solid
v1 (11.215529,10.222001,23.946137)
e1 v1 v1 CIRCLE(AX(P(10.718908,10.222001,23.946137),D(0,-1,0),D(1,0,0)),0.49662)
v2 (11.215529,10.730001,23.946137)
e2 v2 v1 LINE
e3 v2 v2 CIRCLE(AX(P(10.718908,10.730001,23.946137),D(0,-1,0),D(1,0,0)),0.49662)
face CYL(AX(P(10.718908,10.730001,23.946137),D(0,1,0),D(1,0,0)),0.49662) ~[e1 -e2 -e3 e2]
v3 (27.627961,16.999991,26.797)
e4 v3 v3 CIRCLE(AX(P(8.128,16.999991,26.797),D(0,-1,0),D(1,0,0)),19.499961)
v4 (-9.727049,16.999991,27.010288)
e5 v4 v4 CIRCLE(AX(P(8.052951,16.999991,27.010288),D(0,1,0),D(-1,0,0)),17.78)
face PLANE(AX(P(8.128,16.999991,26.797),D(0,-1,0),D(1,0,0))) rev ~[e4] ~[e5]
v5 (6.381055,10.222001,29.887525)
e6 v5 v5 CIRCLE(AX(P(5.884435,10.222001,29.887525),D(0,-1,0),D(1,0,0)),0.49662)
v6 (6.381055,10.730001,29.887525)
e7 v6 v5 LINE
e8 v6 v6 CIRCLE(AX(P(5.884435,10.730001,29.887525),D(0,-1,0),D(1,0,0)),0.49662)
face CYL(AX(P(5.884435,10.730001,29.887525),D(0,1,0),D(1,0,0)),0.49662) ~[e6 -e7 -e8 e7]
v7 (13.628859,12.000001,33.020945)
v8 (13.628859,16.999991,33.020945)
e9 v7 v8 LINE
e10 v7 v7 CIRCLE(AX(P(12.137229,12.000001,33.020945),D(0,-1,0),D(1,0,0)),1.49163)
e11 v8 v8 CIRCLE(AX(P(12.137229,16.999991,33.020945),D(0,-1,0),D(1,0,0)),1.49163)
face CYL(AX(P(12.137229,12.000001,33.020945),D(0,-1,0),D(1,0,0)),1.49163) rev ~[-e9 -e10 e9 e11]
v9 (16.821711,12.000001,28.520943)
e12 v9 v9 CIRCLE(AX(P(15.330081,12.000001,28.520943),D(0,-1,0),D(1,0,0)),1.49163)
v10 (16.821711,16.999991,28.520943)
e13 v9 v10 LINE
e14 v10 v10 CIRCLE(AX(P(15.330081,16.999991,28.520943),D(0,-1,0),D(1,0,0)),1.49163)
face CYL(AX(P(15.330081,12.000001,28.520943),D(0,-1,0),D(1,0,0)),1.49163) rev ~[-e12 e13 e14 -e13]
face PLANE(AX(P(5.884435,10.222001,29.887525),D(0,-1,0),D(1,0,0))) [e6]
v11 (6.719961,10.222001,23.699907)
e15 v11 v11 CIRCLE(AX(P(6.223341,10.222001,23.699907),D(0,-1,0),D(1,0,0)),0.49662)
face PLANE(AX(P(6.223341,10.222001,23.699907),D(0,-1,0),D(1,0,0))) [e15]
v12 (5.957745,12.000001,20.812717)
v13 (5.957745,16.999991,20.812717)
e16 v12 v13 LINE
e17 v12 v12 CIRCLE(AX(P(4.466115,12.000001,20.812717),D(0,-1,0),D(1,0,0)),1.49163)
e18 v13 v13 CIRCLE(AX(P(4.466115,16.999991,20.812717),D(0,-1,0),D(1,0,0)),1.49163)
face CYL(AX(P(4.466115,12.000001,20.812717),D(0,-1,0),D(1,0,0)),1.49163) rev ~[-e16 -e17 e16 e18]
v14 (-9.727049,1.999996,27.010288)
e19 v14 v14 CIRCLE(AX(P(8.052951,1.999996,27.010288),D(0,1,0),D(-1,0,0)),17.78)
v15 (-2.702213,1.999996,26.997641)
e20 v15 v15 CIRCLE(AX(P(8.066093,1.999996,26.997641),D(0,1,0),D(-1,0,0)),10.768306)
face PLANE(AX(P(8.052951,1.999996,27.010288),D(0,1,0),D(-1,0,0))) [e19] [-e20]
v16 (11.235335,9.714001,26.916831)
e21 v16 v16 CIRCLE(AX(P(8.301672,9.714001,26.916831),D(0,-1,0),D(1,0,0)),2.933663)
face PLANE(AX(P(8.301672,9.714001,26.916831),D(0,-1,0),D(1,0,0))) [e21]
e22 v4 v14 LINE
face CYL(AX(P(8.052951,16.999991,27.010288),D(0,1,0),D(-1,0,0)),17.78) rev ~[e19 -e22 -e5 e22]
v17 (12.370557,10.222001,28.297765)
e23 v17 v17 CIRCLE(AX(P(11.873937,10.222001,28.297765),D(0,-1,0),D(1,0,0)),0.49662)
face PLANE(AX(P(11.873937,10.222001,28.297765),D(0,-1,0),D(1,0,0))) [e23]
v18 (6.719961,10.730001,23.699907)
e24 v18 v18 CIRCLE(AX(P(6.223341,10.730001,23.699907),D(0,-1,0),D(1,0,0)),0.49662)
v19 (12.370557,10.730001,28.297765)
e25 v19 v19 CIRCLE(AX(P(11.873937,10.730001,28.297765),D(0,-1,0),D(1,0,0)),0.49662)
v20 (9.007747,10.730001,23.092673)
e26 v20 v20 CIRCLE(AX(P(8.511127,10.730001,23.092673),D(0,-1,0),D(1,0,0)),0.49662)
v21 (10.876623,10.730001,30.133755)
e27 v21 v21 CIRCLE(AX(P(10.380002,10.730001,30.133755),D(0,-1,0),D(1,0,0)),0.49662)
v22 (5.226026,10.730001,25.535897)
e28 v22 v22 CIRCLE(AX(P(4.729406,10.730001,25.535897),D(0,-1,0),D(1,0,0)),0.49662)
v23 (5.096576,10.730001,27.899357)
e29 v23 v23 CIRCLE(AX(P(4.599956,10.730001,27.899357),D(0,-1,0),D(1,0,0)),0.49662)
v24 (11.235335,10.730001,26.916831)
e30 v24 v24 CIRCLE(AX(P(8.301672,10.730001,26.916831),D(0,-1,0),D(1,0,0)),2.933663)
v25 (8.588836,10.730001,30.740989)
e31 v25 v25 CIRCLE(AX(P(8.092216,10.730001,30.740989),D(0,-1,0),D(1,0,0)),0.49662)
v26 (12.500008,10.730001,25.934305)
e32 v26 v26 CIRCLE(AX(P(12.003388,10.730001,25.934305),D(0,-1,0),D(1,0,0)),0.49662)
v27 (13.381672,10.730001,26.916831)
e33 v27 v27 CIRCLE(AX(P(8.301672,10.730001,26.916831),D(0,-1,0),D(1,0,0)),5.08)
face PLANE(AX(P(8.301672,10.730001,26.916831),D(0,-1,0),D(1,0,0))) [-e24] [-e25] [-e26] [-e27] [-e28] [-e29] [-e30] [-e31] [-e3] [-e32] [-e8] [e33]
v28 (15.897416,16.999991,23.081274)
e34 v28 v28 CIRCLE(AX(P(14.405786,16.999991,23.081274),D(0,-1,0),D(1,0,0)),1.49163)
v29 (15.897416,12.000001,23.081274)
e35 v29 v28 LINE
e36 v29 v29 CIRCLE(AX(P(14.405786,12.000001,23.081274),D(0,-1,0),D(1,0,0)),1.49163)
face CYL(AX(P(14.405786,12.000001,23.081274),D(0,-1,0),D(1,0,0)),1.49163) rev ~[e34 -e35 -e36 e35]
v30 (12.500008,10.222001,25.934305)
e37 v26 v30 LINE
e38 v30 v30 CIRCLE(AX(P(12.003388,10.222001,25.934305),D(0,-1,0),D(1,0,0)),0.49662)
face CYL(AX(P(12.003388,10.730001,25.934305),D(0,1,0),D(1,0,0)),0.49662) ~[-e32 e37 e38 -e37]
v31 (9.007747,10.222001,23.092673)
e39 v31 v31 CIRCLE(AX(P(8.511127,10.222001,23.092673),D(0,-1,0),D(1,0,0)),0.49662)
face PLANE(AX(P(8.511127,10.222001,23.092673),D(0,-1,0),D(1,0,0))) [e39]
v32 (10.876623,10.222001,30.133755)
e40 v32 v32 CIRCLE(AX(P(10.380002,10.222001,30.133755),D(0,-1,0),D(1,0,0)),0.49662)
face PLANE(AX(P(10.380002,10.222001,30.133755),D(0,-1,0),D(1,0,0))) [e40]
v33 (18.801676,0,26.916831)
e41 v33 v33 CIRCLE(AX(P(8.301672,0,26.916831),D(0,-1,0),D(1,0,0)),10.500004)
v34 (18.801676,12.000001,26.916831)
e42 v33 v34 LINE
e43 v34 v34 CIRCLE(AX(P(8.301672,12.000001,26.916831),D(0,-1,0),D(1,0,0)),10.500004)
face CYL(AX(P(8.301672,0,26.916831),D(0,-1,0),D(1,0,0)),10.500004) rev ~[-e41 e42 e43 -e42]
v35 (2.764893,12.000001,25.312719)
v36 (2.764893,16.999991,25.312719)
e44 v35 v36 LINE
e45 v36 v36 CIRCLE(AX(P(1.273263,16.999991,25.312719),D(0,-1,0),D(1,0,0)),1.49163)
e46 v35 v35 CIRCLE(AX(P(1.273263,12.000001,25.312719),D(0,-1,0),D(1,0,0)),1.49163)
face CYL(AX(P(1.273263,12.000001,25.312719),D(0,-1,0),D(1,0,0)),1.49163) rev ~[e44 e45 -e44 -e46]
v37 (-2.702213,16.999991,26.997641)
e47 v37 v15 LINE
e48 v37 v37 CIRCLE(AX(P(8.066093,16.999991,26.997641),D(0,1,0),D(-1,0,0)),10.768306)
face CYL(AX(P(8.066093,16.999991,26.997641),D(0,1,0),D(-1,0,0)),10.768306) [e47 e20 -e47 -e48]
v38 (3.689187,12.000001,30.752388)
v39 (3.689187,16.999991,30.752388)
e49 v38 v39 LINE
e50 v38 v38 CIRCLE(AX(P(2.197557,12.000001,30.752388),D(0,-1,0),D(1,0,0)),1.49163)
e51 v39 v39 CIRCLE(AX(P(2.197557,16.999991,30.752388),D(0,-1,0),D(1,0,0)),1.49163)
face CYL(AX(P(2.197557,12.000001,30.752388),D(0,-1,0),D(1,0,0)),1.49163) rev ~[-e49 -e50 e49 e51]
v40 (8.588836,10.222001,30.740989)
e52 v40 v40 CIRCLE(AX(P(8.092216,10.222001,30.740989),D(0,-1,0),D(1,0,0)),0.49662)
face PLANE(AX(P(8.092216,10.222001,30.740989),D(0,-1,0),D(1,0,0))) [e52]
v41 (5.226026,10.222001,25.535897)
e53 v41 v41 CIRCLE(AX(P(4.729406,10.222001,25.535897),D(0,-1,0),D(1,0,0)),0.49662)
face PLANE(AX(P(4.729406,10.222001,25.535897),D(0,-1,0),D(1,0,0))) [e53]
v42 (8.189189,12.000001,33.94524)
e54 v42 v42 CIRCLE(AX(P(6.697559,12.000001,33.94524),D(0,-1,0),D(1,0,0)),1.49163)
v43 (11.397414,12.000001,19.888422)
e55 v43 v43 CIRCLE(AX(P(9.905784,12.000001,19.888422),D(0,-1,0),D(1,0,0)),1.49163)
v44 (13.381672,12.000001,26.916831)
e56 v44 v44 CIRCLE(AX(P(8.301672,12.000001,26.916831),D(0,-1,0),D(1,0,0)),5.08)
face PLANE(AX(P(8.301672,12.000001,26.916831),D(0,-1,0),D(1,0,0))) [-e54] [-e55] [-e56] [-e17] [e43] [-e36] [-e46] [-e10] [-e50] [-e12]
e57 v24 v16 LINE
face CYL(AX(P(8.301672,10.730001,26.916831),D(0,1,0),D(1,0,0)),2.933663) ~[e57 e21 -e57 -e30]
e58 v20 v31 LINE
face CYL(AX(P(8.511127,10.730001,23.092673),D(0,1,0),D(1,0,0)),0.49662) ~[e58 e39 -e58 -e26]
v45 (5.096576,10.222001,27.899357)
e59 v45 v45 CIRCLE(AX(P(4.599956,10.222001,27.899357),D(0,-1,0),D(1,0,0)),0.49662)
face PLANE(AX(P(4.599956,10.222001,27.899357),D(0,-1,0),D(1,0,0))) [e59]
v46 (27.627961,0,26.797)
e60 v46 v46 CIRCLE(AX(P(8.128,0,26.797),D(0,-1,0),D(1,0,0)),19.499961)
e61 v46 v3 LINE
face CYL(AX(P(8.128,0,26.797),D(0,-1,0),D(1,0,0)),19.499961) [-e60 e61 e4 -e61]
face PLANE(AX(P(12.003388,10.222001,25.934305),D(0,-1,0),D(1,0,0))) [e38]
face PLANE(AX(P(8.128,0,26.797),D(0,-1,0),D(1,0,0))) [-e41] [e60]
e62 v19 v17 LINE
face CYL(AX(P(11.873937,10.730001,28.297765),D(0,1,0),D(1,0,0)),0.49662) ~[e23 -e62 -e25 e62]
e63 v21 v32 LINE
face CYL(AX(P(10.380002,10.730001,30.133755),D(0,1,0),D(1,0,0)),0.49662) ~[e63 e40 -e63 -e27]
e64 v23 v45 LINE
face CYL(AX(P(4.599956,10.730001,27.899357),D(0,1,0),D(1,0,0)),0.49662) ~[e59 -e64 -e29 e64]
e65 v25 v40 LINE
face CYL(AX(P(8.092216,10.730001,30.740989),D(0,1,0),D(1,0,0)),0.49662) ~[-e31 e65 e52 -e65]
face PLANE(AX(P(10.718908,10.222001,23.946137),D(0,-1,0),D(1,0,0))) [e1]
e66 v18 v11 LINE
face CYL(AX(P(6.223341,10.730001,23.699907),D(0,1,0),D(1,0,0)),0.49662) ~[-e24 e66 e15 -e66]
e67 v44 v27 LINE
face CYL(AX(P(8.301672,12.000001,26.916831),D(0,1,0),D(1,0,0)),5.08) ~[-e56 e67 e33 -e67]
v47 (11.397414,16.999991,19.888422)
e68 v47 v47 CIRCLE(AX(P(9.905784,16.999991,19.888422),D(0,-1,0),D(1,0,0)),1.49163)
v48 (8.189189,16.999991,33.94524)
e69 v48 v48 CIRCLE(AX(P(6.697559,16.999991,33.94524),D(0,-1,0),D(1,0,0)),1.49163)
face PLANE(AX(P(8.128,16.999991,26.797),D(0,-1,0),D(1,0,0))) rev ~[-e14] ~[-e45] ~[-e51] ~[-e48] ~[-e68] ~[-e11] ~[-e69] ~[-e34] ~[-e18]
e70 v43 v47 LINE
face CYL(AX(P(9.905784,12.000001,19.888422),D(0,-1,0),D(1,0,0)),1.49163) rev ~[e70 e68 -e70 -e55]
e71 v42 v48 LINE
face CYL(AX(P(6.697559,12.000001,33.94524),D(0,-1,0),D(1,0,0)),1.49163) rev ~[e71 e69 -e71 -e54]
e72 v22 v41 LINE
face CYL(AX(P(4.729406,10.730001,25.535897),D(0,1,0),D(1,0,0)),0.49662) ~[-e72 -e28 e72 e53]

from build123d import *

# Parameters (mm, degrees)
F0_R      = 19.499961
F2_DEPTH  = 16.9999914
F1_R      = 10.5000044
F3_DEPTH  = 12.0000014
F4_R      = 1.4916301958
F5_DEPTH  = 25.4
F7_R      = 17.78
F7_R_2    = 10.7683059636
F8_DEPTH  = 14.9999954
F9_R      = 5.08
F10_DEPTH = 1.27
F13_R     = 2.9336630642
F14_DEPTH = 1.016
F15_R     = 0.4966201378
F16_DEPTH = 0.508


# Not quite as in the source:
# - the program builds the solid bodies; features that only make, move or delete a surface that nothing else refers to are left out


with BuildPart() as f2:
    # F0 (on Front) → F2 (new body)
    with BuildSketch(Plane.XZ):
        with Locations((8.1280004233, 26.7970003188)):
            Circle(F0_R)
    extrude(amount=-F2_DEPTH)

    # F1 (on face) → F3 (cut)
    with BuildSketch(Plane.XZ):
        with Locations((8.3016715726, 26.9168310782)):
            Circle(F1_R)
    extrude(amount=-F3_DEPTH, mode=Mode.SUBTRACT)

    # F4 (on face) → F5 (cut)
    with BuildSketch(Plane.XZ.offset(-12.0000014)):
        with Locations((6.6975592636, 33.9452400804)):
            Circle(F4_R)
        with Locations((12.1372285474, 33.0209454361)):
            Circle(F4_R)
        with Locations((15.3300805747, 28.5209433873)):
            Circle(F4_R)
        with Locations((14.4057859305, 23.0812741034)):
            Circle(F4_R)
        with Locations((9.9057838817, 19.8884220761)):
            Circle(F4_R)
        with Locations((4.4661145978, 20.8127167204)):
            Circle(F4_R)
        with Locations((1.2732625705, 25.3127187692)):
            Circle(F4_R)
        with Locations((2.1975572148, 30.7523880531)):
            Circle(F4_R)
    extrude(amount=-F5_DEPTH, mode=Mode.SUBTRACT)

    # F7 (on face) → F8 (cut)
    with BuildSketch(Plane(origin=(0, 16.9999914, 0), x_dir=(-1, 0, 0), z_dir=(0, 1, 0))):
        with Locations((-8.0529511662, 27.0102884156)):
            Circle(F7_R)
        with Locations((-8.0660926178, 26.997640729)):
            Circle(F7_R_2, mode=Mode.SUBTRACT)
    extrude(amount=-F8_DEPTH, mode=Mode.SUBTRACT)

    # F9 (on face) → F10 (join)
    with BuildSketch(Plane.XZ.offset(-12.0000014)):
        with Locations((8.3016715726, 26.9168310782)):
            Circle(F9_R)
    extrude(amount=F10_DEPTH)

    # F13 (on face) → F14 (join)
    with BuildSketch(Plane.XZ.offset(-10.7300014)):
        with Locations((8.3016715726, 26.9168310782)):
            Circle(F13_R)
    extrude(amount=F14_DEPTH)

    # F15 (on face) → F16 (join)
    with BuildSketch(Plane.XZ.offset(-10.7300014)):
        with Locations((8.092216216, 30.7409893721)):
            Circle(F15_R)
        with Locations((10.3800024772, 30.1337548968)):
            Circle(F15_R)
        with Locations((11.8739369726, 28.297764862)):
            Circle(F15_R)
        with Locations((12.0033875021, 25.934305058)):
            Circle(F15_R)
        with Locations((10.7189083633, 23.9461367989)):
            Circle(F15_R)
        with Locations((8.5111269292, 23.0926727844)):
            Circle(F15_R)
        with Locations((6.2233406681, 23.6999072597)):
            Circle(F15_R)
        with Locations((4.7294061726, 25.5358972945)):
            Circle(F15_R)
        with Locations((4.5999556431, 27.8993570985)):
            Circle(F15_R)
        with Locations((5.884434782, 29.8875253576)):
            Circle(F15_R)
    extrude(amount=F16_DEPTH)


solid = f2.part
